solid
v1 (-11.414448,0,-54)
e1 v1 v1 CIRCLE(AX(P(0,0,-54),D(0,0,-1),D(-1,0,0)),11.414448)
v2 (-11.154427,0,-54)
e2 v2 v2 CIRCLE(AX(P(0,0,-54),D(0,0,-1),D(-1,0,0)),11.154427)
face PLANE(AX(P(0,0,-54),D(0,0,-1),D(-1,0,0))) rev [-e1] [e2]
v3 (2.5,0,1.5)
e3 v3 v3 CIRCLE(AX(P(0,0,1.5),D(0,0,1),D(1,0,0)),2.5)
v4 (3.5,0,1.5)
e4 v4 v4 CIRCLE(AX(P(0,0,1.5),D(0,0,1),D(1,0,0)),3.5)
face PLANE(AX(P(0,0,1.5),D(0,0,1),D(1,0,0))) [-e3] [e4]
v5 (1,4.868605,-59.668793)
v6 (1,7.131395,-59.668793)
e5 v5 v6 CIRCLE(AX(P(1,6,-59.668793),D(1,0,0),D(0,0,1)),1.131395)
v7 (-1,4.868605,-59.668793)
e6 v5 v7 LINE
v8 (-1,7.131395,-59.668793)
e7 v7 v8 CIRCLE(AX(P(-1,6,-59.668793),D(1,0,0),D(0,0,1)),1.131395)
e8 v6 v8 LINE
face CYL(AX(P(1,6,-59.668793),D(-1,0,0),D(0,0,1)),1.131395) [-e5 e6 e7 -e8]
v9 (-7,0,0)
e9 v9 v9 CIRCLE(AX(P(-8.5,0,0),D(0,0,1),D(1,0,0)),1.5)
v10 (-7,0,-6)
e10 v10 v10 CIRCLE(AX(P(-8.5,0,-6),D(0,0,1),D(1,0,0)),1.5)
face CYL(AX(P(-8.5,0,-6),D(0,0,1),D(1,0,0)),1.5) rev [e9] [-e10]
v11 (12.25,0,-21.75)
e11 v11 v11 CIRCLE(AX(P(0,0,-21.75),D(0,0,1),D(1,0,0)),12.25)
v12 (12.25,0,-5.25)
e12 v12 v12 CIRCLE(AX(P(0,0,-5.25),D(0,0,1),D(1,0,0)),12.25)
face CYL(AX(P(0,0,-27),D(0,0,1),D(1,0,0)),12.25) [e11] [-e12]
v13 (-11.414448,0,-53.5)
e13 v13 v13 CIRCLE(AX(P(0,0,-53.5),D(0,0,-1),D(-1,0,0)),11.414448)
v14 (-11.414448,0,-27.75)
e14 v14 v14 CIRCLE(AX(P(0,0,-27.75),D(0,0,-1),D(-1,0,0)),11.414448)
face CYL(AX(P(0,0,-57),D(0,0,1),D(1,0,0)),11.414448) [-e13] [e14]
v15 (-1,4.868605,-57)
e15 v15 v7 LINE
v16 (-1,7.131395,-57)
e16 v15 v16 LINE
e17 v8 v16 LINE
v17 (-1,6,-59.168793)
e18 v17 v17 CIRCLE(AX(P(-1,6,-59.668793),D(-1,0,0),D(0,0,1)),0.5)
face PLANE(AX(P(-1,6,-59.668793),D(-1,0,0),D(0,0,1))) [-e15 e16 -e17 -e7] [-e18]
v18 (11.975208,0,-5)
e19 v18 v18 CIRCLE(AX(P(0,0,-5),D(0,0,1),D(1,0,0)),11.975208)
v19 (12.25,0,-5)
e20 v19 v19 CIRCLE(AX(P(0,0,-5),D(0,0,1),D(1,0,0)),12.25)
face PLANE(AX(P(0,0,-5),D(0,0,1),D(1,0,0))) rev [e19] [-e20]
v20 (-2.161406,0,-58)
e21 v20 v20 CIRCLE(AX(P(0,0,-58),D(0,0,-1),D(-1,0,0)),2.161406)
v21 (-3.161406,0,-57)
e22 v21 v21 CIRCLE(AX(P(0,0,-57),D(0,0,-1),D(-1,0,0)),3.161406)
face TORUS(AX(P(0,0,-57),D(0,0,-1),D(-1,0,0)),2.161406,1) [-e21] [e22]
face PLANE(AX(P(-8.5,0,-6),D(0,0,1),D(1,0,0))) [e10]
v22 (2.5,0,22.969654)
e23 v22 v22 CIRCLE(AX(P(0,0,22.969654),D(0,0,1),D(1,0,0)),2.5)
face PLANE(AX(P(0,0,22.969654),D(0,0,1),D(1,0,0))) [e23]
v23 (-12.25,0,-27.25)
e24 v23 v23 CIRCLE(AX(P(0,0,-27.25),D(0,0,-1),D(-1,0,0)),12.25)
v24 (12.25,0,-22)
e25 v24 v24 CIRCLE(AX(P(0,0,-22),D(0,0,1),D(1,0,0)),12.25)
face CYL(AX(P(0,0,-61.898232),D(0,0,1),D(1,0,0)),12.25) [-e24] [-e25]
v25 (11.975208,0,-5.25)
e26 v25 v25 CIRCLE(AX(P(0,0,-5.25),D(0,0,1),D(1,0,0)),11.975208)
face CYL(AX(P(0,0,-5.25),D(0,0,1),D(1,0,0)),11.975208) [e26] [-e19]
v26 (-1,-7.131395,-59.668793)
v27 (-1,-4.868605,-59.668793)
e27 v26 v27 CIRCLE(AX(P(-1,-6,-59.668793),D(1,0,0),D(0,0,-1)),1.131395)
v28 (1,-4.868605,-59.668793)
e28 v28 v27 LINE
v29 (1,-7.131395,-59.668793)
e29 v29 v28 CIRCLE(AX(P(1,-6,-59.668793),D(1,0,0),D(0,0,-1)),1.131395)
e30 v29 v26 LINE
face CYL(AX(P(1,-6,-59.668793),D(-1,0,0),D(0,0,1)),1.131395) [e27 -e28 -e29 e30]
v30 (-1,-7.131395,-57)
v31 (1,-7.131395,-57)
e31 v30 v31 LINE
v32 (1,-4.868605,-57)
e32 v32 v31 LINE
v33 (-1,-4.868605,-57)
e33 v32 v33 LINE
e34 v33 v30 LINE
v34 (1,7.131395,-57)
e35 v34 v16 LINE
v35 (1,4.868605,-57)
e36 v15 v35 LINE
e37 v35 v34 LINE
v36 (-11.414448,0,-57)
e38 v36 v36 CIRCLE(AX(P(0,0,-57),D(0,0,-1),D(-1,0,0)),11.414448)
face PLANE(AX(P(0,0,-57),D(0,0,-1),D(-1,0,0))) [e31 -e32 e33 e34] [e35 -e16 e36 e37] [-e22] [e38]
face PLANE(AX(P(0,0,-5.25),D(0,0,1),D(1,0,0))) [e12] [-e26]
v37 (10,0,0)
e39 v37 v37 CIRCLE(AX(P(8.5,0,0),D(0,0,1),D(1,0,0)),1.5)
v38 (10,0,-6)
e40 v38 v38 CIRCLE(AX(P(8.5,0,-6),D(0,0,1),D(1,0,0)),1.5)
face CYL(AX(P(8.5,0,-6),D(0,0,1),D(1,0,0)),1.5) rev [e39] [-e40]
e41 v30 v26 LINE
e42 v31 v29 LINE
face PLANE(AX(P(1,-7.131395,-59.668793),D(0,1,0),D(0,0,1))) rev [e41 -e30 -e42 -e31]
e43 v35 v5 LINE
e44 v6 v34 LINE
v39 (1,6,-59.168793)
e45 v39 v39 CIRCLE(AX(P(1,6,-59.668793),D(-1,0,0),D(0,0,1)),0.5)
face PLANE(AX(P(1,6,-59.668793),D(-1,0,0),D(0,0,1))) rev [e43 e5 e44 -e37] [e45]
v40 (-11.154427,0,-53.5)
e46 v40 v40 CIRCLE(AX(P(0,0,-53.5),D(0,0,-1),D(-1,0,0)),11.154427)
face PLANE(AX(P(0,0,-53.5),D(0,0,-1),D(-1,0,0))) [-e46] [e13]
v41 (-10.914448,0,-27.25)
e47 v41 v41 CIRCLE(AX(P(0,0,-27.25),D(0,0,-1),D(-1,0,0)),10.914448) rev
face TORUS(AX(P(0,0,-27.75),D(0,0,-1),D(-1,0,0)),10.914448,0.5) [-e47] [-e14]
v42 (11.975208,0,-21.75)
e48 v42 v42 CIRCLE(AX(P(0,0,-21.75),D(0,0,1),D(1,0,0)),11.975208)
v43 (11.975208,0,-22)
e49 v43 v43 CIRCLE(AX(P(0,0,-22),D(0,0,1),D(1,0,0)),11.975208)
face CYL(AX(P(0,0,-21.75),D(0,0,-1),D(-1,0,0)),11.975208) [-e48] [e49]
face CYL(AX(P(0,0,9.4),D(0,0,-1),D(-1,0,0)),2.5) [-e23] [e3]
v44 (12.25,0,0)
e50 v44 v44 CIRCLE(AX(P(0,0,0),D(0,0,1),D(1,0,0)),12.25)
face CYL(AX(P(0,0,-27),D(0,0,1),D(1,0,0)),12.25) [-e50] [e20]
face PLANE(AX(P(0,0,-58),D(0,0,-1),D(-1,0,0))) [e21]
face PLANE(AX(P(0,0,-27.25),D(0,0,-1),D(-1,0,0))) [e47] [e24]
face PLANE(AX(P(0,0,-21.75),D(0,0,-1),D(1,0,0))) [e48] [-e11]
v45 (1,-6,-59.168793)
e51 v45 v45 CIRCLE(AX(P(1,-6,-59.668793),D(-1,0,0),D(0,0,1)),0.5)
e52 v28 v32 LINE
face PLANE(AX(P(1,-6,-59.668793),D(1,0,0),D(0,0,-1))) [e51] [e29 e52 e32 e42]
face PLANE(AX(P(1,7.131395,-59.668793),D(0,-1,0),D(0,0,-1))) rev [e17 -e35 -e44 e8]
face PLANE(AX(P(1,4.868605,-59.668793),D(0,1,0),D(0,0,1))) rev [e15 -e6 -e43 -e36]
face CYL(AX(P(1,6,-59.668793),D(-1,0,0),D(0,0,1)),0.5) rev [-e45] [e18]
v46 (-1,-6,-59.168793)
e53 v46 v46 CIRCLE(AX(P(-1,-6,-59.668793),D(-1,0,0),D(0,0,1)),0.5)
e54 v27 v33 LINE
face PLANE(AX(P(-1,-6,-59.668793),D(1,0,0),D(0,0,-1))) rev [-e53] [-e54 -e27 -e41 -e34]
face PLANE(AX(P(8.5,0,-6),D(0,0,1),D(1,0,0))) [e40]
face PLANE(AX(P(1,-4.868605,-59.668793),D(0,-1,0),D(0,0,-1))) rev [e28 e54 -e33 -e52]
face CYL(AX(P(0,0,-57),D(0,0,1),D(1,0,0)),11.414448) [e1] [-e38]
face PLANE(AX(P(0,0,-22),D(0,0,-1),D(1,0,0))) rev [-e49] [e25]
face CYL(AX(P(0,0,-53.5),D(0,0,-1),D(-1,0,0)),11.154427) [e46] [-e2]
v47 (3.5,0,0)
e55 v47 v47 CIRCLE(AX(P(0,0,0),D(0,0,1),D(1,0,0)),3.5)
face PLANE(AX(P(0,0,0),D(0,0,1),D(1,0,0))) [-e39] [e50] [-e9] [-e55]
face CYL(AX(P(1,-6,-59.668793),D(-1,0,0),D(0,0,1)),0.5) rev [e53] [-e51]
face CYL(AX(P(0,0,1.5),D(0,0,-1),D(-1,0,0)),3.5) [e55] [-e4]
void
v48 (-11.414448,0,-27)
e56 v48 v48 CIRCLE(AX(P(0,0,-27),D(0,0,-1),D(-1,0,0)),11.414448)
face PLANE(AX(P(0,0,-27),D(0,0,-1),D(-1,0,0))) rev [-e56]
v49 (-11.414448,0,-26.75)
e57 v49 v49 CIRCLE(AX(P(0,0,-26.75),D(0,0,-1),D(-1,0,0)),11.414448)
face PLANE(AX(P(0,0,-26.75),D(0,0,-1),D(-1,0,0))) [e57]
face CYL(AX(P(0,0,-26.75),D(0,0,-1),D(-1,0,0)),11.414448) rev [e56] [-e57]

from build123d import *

# Parameters (mm, degrees)
SKETCH1_R           = 12.25
BOSS_EXTRUDE1_DEPTH = 27
SKETCH2_R           = 11.414448149
BOSS_EXTRUDE2_DEPTH = 30
SKETCH3_R           = 2.5
BOSS_EXTRUDE3_DEPTH = 9.4
BOSS_EXTRUDE4_DEPTH = 1
SKETCH5_R           = 0.5
CUT_EXTRUDE1_DEPTH  = 2
SKETCH6_R           = 3.5
BOSS_EXTRUDE5_DEPTH = 1.5
SKETCH7_R           = 3.161406384
BOSS_EXTRUDE6_DEPTH = 1
FILLET1_R           = 1
CUT_EXTRUDE2_START  = -8
CUT_EXTRUDE2_DEPTH  = 8
SKETCH9_R           = 1.5
CUT_EXTRUDE3_DEPTH  = 6
SKETCH10_R          = 12.25
SKETCH10_R_2        = 11.97520775
CUT_EXTRUDE4_DEPTH  = 0.25
CUT_EXTRUDE7_START  = -0.5
SKETCH11_R          = 11.414448149
CUT_EXTRUDE7_DEPTH  = 0.5
FILLET2_R           = 0.5
SKETCH12_R          = 12.25
BOSS_EXTRUDE7_DEPTH = 0.25
SKETCH13_R          = 11.414448149
SKETCH13_R_2        = 11.154427358
CUT_EXTRUDE8_DEPTH  = 0.5
SKETCH3_2_R         = 2.5
BOSS_EXTRUDE8_DEPTH = 22.969653899


with BuildPart() as part:
    # Sketch1 → Boss-Extrude1 (new body)
    with BuildSketch(Plane.XY):
        Circle(SKETCH1_R)
    extrude(amount=-BOSS_EXTRUDE1_DEPTH)

    # Sketch2 → Boss-Extrude2 (add)
    with BuildSketch(Plane(origin=(0, 0, -27), x_dir=(-1, 0, 0), z_dir=(0, 0, -1))):
        Circle(SKETCH2_R)
    extrude(amount=BOSS_EXTRUDE2_DEPTH)

    # Sketch3 → Boss-Extrude3 (add)
    with BuildSketch(Plane.XY):
        Circle(SKETCH3_R)
    extrude(amount=BOSS_EXTRUDE3_DEPTH)

    # Sketch4 → Boss-Extrude4 (add, symmetric)
    with BuildSketch(Plane(origin=(0, 0, 0), x_dir=(0, 0, -1), z_dir=(1, 0, 0))):
        with BuildLine():
            Line((59.668792543, -7.131394742), (55.656453017, -7.131394742))
            ThreePointArc((55.656453017, -7.131394742), (54.525058274, -6), (55.656453017, -4.868605258))
            Line((55.656453017, -4.868605258), (59.668792543, -4.868605258))
            ThreePointArc((59.668792543, -4.868605258), (60.800187285, -6), (59.668792543, -7.131394742))
        make_face()
        with BuildLine():
            Line((59.668792543, 7.131394742), (55.656453017, 7.131394742))
            ThreePointArc((55.656453017, 7.131394742), (54.525058274, 6), (55.656453017, 4.868605258))
            Line((55.656453017, 4.868605258), (59.668792543, 4.868605258))
            ThreePointArc((59.668792543, 4.868605258), (60.800187285, 6), (59.668792543, 7.131394742))
        make_face()
    extrude(amount=BOSS_EXTRUDE4_DEPTH, both=True)

    # Sketch5 → Cut-Extrude1 (cut)
    with BuildSketch(Plane.ZY.offset(1)):
        with Locations((-59.668792543, -6)):
            Circle(SKETCH5_R)
        with Locations((-59.668792543, 6)):
            Circle(SKETCH5_R)
    extrude(amount=-CUT_EXTRUDE1_DEPTH, mode=Mode.SUBTRACT)

    # Sketch6 → Boss-Extrude5 (add)
    with BuildSketch(Plane.XY):
        Circle(SKETCH6_R)
    extrude(amount=BOSS_EXTRUDE5_DEPTH)

    # Sketch7 → Boss-Extrude6 (add)
    with BuildSketch(Plane(origin=(0, 0, -57), x_dir=(-1, 0, 0), z_dir=(0, 0, -1))):
        Circle(SKETCH7_R)
    extrude(amount=BOSS_EXTRUDE6_DEPTH)

    # Fillet1
    fillet1_edges = [part.edges().sort_by_distance(p)[0] for p in [
        (3.161406384, 0, -58),
    ]]
    fillet(fillet1_edges, radius=FILLET1_R - 0.0001)  # a hair under: the kernel refuses the full size

    # Sketch8 → Cut-Extrude2 (cut)
    with BuildSketch(Plane.XY.offset(9.4).offset(CUT_EXTRUDE2_START)):
        with BuildLine():
            Line((-1.842673821, 1.689542302), (1.842673821, 1.689542302))
            ThreePointArc((1.842673821, 1.689542302), (0, 2.5), (-1.842673821, 1.689542302))
        make_face()
    extrude(amount=CUT_EXTRUDE2_DEPTH, mode=Mode.SUBTRACT)

    # Sketch9 → Cut-Extrude3 (cut)
    with BuildSketch(Plane.XY):
        with Locations((-8.5, 0)):
            Circle(SKETCH9_R)
        with Locations((8.5, 0)):
            Circle(SKETCH9_R)
    extrude(amount=-CUT_EXTRUDE3_DEPTH, mode=Mode.SUBTRACT)

    # Sketch10 → Cut-Extrude4 (cut)
    with BuildSketch(Plane.XY.offset(-5)):
        Circle(SKETCH10_R)
        Circle(SKETCH10_R_2, mode=Mode.SUBTRACT)
    cut_extrude4 = extrude(amount=-CUT_EXTRUDE4_DEPTH, mode=Mode.SUBTRACT)

    # Mirror1: Cut-Extrude4 across plane
    add(cut_extrude4.mirror(Plane.XY.offset(-13.5)), mode=Mode.SUBTRACT)

    # Sketch11 → Cut-Extrude7 (cut)
    with BuildSketch(Plane(origin=(0, 0, -27.25), x_dir=(-1, 0, 0), z_dir=(0, 0, -1)).offset(CUT_EXTRUDE7_START)):
        Circle(SKETCH11_R)
    extrude(amount=CUT_EXTRUDE7_DEPTH, mode=Mode.SUBTRACT)


with BuildPart() as cut_extrude7_piece_1:
    # of the separate pieces the step leaves, piece 1, a body of its own (cut_extrude7_pieces)
    add(part.part.solids().sort_by_distance((12.25, 0, -27))[0])



with BuildPart() as cut_extrude7_piece_2:
    # of the separate pieces the step leaves, piece 2, a body of its own (cut_extrude7_pieces)
    add(part.part.solids().sort_by_distance((-3.161406384, 0, -57.0001))[0])

    # Fillet2
    fillet2_edges = [cut_extrude7_piece_2.edges().sort_by_distance(p)[0] for p in [
        (11.414448149, 0, -27.25),
    ]]
    fillet(fillet2_edges, radius=FILLET2_R)


with BuildPart() as cut_extrude7_piece_1_1:
    add(cut_extrude7_piece_1.part)

    add(cut_extrude7_piece_2.part)  # Boss-Extrude7 merges Cut-Extrude7 piece 2
    # Sketch12 → Boss-Extrude7 (add)
    with BuildSketch(Plane(origin=(0, 0, -27), x_dir=(-1, 0, 0), z_dir=(0, 0, -1))):
        with Locations(Location((0, 0, 0), (0, 0, 180))):
            Circle(SKETCH12_R)
    extrude(amount=BOSS_EXTRUDE7_DEPTH)

    # Sketch13 → Cut-Extrude8 (cut)
    with BuildSketch(Plane(origin=(0, 0, -54), x_dir=(-1, 0, 0), z_dir=(0, 0, -1))):
        Circle(SKETCH13_R)
        Circle(SKETCH13_R_2, mode=Mode.SUBTRACT)
    extrude(amount=-CUT_EXTRUDE8_DEPTH, mode=Mode.SUBTRACT)

    # Sketch3<2> → Boss-Extrude8 (add)
    with BuildSketch(Plane.XY):
        Circle(SKETCH3_2_R)
    extrude(amount=BOSS_EXTRUDE8_DEPTH)


solid = cut_extrude7_piece_1_1.part
